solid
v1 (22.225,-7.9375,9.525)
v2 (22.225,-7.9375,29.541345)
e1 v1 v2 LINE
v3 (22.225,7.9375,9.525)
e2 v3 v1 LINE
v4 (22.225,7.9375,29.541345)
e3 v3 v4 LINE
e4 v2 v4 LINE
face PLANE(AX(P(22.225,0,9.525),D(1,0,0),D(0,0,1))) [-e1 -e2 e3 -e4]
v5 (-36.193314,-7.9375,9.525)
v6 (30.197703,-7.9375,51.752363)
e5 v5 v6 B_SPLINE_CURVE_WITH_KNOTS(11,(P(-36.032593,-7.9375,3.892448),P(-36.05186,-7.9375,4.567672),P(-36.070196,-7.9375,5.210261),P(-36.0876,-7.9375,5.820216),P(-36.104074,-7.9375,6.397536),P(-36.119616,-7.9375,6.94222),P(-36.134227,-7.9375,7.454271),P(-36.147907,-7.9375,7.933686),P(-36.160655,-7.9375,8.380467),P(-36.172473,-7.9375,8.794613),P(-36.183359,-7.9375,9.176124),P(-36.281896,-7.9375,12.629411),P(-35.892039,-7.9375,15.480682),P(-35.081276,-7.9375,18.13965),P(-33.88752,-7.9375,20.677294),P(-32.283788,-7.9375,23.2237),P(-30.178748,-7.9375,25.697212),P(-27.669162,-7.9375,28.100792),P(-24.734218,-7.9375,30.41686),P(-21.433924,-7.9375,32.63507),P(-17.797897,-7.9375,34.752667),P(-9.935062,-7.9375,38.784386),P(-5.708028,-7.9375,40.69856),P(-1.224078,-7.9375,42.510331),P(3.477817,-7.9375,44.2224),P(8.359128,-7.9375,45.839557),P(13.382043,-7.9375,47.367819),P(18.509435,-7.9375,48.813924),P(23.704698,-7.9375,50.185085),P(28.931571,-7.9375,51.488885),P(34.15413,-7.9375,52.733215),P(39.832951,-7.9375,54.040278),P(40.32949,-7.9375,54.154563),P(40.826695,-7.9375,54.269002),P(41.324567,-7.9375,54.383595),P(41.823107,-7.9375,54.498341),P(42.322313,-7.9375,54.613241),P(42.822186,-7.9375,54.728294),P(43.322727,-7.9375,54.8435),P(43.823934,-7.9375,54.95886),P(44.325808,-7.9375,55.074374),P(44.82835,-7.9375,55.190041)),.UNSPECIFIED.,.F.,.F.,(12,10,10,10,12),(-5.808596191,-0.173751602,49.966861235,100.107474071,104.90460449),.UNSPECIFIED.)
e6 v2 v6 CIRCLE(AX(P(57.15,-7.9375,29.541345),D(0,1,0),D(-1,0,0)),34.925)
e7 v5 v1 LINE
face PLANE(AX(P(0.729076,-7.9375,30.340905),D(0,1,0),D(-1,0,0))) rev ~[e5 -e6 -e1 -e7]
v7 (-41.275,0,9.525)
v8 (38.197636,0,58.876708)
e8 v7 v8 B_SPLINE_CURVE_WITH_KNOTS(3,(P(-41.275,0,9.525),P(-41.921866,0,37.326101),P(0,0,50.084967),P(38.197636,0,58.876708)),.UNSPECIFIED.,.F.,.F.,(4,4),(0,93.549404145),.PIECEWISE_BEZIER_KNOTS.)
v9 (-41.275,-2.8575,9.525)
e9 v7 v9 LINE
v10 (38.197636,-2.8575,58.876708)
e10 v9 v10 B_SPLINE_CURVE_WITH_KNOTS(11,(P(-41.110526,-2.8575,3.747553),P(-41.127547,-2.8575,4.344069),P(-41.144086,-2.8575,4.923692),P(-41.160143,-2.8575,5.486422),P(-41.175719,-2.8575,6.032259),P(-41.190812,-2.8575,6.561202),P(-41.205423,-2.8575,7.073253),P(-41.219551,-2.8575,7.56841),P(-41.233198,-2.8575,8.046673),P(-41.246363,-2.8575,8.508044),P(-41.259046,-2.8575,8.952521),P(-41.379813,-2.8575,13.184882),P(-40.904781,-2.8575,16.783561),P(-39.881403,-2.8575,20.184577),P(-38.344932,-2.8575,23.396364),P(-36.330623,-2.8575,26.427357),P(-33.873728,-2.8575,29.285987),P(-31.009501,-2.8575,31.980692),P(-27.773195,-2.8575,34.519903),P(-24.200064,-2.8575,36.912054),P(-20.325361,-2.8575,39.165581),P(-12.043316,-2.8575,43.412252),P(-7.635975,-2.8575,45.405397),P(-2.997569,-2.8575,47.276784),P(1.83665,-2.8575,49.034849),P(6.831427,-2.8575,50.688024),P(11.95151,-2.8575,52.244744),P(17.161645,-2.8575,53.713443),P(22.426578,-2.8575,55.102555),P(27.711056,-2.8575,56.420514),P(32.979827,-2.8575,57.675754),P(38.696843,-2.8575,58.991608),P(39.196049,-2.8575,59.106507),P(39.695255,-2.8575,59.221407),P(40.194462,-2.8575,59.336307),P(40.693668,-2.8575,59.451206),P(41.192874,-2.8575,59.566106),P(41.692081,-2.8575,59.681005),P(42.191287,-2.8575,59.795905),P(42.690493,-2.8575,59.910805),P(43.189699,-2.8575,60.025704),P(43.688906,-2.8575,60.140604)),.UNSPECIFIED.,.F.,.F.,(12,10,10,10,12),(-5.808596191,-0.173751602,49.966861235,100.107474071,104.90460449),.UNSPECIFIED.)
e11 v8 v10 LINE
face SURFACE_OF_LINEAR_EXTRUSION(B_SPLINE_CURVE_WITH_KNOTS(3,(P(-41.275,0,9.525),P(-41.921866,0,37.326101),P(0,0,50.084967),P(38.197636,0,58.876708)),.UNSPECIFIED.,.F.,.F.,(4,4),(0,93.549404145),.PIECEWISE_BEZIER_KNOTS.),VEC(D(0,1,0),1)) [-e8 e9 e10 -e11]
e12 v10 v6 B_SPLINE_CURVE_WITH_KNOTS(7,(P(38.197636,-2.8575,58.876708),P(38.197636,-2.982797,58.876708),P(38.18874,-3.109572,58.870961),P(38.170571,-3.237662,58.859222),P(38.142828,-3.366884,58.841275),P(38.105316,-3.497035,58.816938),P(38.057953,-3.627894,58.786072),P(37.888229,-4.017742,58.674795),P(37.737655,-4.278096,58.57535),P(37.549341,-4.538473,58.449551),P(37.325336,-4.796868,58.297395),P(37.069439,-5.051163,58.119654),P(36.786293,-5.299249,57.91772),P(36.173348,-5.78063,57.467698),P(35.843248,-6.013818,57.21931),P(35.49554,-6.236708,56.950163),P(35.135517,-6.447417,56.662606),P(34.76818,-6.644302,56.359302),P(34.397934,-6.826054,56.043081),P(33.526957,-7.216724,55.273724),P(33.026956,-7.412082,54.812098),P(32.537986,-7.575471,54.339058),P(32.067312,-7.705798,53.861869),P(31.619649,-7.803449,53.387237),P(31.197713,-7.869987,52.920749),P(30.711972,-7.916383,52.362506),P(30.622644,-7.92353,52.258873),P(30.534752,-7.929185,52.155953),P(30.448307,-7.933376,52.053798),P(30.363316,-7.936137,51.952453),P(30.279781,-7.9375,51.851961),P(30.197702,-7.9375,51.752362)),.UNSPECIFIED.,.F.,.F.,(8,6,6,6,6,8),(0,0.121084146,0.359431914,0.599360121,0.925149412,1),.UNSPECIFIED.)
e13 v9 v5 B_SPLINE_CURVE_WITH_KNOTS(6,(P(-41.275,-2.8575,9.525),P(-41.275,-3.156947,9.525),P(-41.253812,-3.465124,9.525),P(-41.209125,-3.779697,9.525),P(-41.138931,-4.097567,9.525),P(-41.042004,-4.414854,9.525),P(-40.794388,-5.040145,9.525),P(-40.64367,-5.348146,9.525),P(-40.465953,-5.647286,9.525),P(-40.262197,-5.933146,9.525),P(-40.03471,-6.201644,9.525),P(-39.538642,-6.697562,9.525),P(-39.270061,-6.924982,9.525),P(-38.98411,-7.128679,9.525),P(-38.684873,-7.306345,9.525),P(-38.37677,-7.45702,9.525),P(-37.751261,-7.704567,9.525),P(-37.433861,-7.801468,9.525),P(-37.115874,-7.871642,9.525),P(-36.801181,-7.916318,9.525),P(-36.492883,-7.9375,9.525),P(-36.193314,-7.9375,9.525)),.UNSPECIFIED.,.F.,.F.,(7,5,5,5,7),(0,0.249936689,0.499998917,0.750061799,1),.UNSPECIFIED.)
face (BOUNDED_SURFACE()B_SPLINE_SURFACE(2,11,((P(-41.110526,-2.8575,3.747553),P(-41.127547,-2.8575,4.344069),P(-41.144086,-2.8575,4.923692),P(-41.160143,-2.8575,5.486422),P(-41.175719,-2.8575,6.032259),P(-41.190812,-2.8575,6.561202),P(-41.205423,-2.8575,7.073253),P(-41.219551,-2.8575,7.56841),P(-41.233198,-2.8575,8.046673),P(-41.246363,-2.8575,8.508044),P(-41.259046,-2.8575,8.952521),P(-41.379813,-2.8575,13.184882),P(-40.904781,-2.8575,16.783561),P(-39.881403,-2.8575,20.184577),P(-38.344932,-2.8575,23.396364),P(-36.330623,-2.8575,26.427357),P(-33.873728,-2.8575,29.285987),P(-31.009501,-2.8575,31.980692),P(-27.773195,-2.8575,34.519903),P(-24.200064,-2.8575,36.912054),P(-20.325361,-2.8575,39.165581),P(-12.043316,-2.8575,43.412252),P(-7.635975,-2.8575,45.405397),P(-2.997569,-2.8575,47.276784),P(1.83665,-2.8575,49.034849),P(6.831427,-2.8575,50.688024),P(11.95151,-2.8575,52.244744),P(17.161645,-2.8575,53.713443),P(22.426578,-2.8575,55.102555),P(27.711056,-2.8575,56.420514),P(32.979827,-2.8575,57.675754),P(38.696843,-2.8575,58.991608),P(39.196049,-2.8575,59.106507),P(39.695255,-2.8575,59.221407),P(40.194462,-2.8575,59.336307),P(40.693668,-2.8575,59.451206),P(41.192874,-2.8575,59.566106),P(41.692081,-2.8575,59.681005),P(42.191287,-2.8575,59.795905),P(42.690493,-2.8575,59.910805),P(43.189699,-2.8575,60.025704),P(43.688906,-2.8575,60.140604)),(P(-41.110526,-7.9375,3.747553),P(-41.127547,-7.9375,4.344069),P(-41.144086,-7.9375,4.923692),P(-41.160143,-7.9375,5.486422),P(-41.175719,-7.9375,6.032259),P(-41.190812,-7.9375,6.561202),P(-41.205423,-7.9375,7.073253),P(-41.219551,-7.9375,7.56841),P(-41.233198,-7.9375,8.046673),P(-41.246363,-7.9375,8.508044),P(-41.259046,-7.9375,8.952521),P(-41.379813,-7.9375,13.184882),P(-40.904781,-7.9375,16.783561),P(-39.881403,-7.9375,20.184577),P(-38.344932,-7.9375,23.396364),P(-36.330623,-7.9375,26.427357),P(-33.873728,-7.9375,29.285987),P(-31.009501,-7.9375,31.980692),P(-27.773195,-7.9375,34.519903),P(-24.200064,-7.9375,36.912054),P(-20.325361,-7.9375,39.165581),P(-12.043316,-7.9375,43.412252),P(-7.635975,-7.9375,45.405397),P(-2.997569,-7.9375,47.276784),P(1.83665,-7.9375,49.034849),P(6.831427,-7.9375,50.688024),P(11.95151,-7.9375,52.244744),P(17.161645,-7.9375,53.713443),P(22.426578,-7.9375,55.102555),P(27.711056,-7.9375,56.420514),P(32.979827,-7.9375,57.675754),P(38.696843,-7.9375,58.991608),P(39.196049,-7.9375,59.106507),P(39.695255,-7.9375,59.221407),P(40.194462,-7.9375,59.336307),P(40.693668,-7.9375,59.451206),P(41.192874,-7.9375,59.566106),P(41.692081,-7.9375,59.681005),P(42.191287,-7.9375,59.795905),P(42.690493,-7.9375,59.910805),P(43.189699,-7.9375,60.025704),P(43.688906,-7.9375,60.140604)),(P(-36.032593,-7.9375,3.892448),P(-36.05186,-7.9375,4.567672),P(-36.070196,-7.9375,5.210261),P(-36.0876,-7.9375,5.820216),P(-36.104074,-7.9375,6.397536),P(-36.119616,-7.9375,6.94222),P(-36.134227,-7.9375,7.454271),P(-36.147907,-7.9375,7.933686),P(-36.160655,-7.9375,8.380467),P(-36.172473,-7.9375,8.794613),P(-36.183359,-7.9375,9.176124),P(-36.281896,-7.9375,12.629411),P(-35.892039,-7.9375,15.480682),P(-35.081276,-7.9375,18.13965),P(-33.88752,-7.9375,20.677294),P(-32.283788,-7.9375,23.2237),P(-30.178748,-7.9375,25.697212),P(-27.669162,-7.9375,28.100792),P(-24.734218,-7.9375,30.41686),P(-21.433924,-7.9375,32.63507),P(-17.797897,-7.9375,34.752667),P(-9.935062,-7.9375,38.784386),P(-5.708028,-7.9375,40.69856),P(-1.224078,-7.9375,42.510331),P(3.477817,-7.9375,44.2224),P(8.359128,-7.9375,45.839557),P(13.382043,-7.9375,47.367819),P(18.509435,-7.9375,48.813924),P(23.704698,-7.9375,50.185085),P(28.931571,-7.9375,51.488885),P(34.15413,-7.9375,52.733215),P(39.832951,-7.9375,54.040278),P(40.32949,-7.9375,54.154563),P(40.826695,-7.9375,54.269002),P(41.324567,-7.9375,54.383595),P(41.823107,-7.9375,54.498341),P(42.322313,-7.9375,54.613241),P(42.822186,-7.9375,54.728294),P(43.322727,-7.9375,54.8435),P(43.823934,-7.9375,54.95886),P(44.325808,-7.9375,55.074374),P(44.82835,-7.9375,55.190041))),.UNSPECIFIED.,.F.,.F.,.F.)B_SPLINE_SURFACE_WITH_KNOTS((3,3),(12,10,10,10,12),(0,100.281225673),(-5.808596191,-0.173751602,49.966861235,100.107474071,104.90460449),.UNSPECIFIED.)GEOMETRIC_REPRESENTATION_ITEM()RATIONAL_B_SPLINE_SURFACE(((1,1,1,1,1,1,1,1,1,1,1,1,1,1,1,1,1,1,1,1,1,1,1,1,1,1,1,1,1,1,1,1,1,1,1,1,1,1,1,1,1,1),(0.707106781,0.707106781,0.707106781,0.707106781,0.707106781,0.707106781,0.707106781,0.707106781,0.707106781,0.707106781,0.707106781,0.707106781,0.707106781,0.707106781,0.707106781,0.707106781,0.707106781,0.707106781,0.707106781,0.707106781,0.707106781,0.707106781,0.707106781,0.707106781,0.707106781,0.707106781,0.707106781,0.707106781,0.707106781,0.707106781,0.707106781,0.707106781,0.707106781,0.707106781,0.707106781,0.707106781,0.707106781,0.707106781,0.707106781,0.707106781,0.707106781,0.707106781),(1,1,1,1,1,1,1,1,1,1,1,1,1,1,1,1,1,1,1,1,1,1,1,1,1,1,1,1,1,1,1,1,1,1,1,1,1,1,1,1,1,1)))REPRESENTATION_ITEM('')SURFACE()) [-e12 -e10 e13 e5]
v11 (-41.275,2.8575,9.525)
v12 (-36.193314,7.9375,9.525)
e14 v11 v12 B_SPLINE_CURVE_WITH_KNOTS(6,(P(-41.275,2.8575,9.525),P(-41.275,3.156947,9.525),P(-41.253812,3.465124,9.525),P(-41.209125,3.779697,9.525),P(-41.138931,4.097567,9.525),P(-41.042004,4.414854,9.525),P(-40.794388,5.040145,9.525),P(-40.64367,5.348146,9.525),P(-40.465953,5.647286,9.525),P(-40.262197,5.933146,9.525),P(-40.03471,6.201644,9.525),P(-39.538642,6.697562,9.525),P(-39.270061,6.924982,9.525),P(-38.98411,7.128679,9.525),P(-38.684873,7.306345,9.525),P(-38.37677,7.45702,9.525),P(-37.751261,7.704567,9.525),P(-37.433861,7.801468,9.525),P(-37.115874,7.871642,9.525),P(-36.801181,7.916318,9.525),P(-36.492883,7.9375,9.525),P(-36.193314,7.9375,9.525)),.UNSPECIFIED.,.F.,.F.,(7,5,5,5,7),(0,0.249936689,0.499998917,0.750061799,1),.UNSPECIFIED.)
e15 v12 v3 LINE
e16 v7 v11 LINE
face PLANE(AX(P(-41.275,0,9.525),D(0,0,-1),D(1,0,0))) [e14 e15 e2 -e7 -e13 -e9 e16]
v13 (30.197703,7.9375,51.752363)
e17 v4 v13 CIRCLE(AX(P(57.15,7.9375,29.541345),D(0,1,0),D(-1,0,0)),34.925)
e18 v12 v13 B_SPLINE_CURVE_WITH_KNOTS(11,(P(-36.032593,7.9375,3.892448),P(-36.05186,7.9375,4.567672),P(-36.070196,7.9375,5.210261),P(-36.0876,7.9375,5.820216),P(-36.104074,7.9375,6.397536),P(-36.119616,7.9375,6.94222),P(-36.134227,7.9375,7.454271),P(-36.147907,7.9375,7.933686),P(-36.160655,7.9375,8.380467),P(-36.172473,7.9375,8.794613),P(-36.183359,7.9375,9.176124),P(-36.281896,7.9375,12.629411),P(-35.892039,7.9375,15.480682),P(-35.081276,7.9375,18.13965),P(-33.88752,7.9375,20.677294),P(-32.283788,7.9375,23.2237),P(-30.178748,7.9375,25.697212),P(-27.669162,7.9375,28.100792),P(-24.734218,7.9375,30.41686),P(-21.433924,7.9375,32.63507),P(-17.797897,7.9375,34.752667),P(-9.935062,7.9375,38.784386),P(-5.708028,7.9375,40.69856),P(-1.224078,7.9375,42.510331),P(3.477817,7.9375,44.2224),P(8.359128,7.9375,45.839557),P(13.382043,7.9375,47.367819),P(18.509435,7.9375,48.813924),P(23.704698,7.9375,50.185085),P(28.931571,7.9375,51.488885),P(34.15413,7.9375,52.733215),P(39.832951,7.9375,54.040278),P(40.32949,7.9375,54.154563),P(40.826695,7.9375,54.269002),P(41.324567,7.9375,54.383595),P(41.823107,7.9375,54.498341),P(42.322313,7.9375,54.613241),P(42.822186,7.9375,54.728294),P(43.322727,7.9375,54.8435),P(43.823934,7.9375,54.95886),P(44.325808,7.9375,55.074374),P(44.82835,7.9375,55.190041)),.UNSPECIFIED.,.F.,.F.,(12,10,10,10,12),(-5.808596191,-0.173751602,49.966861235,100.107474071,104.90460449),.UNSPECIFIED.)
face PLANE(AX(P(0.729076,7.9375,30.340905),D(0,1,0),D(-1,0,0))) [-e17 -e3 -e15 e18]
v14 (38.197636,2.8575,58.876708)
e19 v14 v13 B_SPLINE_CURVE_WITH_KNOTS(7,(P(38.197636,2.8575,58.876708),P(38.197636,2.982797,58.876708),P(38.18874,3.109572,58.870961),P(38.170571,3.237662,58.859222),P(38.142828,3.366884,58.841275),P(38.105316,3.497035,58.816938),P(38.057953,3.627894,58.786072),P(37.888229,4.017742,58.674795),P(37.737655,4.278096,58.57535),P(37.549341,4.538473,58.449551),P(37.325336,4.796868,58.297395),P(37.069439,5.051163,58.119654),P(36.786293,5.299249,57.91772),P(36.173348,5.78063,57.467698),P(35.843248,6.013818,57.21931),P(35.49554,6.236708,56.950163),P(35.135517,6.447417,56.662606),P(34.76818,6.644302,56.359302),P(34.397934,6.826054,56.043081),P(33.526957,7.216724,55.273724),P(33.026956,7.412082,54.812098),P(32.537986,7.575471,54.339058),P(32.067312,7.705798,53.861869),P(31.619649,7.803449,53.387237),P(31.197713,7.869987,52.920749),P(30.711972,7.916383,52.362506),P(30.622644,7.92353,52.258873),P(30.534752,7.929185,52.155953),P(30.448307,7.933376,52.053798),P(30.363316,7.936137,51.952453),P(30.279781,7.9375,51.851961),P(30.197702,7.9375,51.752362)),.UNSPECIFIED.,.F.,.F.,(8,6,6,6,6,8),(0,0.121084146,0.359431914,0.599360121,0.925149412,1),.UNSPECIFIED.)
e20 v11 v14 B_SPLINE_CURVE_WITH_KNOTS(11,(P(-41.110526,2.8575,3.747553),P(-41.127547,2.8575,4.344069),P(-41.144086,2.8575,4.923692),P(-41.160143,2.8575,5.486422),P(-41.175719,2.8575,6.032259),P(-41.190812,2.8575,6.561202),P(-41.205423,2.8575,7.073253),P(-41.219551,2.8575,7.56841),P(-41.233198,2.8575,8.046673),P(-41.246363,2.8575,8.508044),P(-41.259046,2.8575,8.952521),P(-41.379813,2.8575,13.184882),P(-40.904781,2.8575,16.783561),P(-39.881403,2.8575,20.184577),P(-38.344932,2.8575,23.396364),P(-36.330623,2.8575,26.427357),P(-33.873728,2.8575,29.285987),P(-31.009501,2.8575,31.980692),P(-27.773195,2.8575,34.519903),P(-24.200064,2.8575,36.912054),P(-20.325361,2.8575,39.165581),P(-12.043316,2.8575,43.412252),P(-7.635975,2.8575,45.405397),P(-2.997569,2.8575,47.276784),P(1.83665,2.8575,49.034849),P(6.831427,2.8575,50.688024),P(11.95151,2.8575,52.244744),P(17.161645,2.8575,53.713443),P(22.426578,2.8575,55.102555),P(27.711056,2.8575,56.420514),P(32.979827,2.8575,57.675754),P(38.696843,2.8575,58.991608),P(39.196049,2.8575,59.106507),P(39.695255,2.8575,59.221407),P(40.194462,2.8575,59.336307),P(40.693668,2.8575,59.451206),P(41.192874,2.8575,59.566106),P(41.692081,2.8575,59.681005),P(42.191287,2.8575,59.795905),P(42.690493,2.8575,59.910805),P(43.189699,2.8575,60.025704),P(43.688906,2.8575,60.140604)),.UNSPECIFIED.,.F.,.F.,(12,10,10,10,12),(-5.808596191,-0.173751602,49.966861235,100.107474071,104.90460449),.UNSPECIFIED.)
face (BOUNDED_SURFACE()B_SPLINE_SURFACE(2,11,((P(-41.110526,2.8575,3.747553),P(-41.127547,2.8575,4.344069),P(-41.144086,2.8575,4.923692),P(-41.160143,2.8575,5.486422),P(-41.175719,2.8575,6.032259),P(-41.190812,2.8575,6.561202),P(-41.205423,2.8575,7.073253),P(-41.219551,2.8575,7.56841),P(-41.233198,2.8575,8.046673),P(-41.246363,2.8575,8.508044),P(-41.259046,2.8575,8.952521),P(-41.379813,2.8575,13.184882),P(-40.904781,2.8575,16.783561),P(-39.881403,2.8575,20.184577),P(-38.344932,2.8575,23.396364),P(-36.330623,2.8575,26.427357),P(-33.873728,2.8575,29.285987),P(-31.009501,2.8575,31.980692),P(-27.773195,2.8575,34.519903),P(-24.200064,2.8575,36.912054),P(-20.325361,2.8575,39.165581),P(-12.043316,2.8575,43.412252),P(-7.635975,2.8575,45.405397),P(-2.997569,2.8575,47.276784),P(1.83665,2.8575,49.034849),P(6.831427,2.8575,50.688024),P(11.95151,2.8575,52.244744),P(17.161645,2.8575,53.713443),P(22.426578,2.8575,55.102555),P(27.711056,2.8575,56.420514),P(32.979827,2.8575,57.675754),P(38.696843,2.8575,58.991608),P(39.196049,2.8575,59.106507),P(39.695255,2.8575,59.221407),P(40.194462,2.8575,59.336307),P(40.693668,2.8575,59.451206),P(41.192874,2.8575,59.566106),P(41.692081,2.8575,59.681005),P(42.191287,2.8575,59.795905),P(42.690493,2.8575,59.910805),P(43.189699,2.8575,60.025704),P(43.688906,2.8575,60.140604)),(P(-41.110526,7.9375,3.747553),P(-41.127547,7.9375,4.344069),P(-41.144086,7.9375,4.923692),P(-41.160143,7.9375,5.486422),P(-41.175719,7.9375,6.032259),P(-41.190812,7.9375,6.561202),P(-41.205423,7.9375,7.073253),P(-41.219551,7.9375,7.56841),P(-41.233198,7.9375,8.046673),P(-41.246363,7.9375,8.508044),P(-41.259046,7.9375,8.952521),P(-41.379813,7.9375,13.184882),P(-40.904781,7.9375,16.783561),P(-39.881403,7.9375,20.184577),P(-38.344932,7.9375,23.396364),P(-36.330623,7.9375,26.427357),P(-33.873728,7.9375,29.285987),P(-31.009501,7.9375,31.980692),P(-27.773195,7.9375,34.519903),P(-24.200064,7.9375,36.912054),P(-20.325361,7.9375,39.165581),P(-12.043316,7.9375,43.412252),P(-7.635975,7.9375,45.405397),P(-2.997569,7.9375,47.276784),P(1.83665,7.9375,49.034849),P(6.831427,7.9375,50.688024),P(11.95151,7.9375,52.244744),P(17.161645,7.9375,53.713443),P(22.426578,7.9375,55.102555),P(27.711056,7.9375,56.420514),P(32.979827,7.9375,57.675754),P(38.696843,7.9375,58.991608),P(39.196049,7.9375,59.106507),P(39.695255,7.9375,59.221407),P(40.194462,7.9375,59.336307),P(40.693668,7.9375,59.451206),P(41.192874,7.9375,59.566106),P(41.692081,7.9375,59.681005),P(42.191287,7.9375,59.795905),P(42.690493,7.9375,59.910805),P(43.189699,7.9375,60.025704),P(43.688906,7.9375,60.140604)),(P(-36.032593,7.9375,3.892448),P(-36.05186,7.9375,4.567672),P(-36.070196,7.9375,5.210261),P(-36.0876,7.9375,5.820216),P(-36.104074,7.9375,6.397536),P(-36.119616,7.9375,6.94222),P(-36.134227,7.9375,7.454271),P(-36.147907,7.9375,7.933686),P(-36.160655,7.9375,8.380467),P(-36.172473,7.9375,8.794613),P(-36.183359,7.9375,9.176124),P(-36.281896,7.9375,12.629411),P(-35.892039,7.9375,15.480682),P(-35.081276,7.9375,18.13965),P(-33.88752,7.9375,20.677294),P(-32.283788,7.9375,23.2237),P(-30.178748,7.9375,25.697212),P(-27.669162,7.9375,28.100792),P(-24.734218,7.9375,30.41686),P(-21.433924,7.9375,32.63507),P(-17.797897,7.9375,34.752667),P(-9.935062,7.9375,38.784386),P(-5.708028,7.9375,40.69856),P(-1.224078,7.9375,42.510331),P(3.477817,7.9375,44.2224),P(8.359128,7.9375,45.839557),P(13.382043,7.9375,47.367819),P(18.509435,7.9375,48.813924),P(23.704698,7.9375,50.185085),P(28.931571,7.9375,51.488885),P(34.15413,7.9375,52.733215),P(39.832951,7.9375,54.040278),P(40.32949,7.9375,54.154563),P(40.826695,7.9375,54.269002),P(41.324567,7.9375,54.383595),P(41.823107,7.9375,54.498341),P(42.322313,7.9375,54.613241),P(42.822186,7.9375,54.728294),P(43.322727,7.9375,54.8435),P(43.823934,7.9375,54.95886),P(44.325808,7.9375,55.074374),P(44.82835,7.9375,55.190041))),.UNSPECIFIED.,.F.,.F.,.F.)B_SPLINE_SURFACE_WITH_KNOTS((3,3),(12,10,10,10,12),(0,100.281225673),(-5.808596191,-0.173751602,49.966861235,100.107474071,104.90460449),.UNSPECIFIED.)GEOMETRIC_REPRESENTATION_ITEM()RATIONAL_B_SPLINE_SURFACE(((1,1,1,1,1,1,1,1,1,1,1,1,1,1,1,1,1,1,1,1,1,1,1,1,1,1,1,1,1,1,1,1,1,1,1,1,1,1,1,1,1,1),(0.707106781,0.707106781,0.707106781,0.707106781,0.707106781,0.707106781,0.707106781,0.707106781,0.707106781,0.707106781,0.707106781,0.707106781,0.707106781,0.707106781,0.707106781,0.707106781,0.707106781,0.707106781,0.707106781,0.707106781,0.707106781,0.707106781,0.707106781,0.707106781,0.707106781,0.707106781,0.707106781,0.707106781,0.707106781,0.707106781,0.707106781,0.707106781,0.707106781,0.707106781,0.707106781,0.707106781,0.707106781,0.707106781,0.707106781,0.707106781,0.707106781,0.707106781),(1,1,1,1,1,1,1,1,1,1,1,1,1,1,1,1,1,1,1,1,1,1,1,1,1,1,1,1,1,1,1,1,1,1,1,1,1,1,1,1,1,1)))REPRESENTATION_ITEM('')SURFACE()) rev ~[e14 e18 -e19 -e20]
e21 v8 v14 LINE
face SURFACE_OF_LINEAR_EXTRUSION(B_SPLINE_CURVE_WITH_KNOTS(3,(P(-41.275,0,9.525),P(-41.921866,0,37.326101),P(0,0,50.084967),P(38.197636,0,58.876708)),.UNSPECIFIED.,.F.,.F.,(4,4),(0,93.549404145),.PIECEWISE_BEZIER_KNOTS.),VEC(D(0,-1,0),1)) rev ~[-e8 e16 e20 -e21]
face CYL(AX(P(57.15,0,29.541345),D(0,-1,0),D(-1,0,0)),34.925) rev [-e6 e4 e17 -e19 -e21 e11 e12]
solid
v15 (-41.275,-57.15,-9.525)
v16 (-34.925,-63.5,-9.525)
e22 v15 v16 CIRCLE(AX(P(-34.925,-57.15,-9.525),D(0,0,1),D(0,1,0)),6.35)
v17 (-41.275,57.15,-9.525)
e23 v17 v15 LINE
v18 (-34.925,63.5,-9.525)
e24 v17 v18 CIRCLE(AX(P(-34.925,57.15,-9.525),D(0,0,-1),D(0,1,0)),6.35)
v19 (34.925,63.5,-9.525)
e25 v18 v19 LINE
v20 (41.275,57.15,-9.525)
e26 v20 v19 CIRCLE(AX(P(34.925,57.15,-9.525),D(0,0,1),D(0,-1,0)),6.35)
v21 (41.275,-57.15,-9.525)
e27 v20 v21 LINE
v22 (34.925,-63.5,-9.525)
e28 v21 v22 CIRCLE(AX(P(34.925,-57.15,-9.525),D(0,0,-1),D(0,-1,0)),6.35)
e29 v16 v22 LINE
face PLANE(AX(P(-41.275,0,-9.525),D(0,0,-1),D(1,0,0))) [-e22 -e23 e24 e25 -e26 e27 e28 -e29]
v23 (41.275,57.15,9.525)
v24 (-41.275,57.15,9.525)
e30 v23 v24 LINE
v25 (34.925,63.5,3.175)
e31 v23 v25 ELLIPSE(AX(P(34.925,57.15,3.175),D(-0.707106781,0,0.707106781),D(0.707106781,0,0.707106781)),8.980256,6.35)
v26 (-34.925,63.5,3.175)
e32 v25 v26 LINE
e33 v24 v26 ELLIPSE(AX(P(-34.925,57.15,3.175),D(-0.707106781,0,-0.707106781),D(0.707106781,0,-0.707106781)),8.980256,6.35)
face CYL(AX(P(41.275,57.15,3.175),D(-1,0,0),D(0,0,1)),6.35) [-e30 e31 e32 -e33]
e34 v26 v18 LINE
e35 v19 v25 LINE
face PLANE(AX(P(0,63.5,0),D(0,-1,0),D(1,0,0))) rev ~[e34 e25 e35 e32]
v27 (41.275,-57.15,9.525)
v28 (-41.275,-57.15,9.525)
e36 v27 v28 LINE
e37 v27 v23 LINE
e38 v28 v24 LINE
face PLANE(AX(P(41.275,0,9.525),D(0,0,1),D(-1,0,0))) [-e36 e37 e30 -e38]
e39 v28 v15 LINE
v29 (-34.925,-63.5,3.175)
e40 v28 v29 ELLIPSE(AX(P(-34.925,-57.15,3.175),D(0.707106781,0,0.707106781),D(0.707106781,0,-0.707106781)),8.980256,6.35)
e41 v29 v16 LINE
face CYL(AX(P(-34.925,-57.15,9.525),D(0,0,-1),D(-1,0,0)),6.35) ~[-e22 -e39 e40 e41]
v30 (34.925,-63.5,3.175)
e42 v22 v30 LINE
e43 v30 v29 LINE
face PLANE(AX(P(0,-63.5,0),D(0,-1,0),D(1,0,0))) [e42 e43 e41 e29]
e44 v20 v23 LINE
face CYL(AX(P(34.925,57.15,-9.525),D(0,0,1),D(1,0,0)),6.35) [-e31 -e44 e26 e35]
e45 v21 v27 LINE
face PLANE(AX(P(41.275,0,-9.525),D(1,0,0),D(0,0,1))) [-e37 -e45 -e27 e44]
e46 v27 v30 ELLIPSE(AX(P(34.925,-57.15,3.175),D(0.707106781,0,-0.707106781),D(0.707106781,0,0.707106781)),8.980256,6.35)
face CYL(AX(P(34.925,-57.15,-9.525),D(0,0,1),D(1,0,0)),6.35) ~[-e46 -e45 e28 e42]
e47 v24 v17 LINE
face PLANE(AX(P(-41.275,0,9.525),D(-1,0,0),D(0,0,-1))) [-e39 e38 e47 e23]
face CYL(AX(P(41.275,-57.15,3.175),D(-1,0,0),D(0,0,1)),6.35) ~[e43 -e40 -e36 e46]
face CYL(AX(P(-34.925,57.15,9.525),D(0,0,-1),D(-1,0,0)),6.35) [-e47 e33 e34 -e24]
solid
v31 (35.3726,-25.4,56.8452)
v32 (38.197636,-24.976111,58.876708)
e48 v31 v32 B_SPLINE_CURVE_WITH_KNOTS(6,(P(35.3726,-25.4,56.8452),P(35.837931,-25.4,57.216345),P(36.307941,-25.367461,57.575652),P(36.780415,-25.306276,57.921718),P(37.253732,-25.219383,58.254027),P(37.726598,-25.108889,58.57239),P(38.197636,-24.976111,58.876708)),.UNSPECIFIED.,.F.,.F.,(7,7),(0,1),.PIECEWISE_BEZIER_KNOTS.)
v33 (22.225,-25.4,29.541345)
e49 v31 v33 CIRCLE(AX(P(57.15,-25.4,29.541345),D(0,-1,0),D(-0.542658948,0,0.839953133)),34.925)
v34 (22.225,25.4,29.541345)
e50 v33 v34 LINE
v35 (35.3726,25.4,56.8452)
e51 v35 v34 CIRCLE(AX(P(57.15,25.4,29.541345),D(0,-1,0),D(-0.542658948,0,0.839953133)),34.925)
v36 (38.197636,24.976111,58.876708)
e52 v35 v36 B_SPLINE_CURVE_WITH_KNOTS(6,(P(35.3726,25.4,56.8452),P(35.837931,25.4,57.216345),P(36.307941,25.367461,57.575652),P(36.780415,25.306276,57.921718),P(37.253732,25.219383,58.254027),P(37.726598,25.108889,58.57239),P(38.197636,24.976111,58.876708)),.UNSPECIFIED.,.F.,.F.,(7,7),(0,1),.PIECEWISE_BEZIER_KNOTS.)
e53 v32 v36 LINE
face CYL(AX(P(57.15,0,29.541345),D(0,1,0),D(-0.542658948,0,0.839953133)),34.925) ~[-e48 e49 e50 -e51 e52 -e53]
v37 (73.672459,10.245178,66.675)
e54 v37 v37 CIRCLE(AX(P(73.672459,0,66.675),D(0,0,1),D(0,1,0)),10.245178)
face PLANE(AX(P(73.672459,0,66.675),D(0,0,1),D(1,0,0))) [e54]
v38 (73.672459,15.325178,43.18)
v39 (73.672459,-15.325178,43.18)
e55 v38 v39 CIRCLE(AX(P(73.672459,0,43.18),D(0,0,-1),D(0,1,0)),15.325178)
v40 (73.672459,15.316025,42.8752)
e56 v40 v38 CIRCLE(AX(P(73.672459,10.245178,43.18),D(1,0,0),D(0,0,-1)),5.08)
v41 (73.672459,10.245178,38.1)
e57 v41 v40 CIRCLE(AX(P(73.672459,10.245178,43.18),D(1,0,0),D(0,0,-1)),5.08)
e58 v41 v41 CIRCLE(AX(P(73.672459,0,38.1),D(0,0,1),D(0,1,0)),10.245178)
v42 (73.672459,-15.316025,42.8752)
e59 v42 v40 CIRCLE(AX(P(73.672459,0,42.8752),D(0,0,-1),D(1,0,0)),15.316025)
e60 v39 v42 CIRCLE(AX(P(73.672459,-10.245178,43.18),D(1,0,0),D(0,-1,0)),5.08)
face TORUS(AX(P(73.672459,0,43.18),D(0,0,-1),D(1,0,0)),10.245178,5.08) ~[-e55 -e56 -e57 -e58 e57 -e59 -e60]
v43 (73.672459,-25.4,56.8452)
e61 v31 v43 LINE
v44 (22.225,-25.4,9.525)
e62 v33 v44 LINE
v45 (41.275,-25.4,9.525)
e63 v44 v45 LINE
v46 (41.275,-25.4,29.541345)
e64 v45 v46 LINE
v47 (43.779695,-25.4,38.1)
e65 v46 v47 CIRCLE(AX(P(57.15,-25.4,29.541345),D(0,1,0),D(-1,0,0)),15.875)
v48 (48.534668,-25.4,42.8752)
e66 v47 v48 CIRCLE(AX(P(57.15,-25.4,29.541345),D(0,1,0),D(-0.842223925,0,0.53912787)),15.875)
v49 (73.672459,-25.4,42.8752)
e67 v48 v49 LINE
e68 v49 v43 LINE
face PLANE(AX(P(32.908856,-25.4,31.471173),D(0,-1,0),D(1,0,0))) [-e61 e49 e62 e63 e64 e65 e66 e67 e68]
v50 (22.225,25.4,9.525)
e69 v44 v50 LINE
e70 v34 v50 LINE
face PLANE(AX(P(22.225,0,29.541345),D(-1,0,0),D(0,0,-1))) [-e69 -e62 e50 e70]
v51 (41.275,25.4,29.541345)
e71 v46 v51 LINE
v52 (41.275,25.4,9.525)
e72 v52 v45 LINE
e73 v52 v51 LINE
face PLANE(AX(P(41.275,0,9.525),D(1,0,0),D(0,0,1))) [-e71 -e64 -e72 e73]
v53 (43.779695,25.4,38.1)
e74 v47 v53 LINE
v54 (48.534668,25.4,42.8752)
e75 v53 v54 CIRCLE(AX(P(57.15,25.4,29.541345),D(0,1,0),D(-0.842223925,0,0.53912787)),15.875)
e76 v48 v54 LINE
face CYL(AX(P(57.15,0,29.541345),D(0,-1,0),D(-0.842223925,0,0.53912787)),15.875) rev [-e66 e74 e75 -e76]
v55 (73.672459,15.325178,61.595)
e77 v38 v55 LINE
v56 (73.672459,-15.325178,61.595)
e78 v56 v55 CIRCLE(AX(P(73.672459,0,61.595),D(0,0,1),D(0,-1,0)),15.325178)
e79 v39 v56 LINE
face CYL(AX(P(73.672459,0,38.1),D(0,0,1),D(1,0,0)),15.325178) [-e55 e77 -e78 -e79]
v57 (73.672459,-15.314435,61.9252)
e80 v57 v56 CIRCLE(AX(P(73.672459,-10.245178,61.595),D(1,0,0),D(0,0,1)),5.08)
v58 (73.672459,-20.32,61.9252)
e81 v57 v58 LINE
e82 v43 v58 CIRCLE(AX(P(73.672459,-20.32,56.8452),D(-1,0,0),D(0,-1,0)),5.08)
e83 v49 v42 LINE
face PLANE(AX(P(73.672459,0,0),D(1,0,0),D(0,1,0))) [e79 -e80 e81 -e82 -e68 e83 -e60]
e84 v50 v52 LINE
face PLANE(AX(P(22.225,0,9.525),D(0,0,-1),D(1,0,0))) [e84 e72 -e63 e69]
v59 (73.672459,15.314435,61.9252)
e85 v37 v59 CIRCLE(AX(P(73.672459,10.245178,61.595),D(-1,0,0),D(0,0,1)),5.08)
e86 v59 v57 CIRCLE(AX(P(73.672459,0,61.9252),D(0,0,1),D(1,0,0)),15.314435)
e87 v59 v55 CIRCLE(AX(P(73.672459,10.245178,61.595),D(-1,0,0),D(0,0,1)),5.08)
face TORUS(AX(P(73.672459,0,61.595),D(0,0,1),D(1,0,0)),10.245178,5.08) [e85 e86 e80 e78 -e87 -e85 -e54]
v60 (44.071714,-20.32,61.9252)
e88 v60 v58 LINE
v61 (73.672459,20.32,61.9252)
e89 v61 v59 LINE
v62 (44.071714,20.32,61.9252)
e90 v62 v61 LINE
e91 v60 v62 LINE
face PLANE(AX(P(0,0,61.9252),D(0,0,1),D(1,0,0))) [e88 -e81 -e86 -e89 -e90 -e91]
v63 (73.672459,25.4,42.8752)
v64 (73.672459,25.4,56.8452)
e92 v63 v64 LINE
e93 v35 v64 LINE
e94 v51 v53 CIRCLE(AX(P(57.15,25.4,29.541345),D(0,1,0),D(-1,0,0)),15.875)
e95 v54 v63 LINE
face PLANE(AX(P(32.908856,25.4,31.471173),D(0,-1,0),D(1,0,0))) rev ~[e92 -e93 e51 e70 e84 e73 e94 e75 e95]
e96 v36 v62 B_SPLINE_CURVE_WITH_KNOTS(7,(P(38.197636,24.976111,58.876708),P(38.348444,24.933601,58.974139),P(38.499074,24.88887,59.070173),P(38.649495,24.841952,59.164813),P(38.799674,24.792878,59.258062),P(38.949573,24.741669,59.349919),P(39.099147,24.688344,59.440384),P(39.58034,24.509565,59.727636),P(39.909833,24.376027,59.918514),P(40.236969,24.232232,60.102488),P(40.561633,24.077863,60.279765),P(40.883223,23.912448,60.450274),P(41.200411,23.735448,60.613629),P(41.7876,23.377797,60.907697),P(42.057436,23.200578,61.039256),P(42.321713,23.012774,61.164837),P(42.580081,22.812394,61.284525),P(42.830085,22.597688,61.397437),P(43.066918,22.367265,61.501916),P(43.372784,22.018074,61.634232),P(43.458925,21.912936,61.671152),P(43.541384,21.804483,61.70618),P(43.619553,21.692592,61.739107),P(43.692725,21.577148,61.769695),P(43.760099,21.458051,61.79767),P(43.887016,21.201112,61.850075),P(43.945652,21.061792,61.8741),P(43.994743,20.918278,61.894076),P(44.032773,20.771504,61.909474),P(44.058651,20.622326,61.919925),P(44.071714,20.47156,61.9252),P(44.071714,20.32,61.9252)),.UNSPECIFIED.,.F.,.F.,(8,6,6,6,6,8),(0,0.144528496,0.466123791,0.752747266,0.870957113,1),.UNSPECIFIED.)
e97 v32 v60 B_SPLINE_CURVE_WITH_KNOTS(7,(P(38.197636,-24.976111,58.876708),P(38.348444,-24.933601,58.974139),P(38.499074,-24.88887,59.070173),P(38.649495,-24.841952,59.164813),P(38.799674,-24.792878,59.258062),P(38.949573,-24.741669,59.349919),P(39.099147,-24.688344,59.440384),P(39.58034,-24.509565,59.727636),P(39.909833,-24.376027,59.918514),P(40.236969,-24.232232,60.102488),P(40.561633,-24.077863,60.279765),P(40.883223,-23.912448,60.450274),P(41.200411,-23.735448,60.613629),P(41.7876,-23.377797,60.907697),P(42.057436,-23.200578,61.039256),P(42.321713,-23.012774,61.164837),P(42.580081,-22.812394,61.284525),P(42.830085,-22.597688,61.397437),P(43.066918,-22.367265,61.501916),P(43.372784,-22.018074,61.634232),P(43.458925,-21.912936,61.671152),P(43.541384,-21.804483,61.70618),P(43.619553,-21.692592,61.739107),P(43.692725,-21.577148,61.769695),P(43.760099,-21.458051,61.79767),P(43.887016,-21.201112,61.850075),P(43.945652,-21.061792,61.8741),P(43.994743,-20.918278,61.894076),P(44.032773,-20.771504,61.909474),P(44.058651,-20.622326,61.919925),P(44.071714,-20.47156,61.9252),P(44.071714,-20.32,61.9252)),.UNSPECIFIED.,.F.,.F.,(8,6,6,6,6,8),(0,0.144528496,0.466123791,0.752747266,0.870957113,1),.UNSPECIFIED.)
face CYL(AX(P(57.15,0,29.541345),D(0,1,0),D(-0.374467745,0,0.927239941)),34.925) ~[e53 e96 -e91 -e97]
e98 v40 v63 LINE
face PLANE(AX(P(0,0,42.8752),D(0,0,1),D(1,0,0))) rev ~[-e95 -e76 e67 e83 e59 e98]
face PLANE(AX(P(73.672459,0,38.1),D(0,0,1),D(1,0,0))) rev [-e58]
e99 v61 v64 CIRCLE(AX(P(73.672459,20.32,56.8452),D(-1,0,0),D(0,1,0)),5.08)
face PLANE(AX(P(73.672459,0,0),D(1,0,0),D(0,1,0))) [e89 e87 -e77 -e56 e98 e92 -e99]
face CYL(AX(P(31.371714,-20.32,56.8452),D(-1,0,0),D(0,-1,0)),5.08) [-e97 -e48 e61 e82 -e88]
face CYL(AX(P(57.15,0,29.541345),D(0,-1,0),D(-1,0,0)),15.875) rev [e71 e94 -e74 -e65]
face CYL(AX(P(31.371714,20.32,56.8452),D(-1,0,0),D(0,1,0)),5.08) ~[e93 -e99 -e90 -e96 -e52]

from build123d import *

# Parameters (mm, degrees)
F1_DEPTH    = 63.5
F2_DEPTH    = 7.9375
F3_DEPTH    = 25.4
F5_R        = 6.35
F6_T1_DEPTH = 55.0007445182
F6_2_F1_R   = 5.08
F6_2_F2_R   = 5.08


# Not quite as in the source:
# - a fillet or chamfer that OpenCascade refuses, or shapes differently, is made with other operations: its cross-section is extruded or revolved along the edge and cut away or added


with BuildPart() as f1:
    # F0 (on Front) → F1 (new body, symmetric)
    with BuildSketch(Plane.XZ):
        Polygon((-41.275, 9.525), (-41.275, -9.525), (41.275, -9.525), (41.275, 9.525), (22.225, 9.525), align=None)
    extrude(amount=F1_DEPTH, both=True)

    # F5
    f5_edges = [f1.edges().sort_by_distance(p)[0] for p in [
        (-41.275, -63.5, 0),
        (41.275, -63.5, 0),
        (41.275, 63.5, 0),
        (-41.275, 63.5, 0),
        (0, 63.5, 9.525),
        (0, -63.5, 9.525),
    ]]
    fillet(f5_edges, radius=F5_R)


with BuildPart() as f2:
    # F0 (on Front) → F2 (new body, symmetric)
    with BuildSketch(Plane.XZ):
        with BuildLine():
            add(Edge.make_bspline(
                [(-41.275, 9.525), (-41.9218663516, 37.3261011822), (0, 50.0849671662), (38.1976362328, 58.8767082382)],
                knots=[0, 0, 0, 0, 93.5494041446, 93.5494041446, 93.5494041446, 93.5494041446], degree=3))
            Line((-41.275, 9.525), (22.225, 9.525))
            Line((22.225, 9.525), (22.225, 29.5413450627))
            ThreePointArc((22.225, 29.5413450627), (26.4769912662, 46.2423079157), (38.1976362328, 58.8767082382))
        make_face()
    extrude(amount=F2_DEPTH, both=True)

    # F6#2: fillet of radius 5.08 on 2 edges, made by hand

    # F6_2_f1
    f6_2_f1_edges = [f2.edges().sort_by_distance(p)[0] for p in [
        (-16.1053703527, 7.9375, 41.3293641604),
    ]]
    fillet(f6_2_f1_edges, radius=F6_2_F1_R)

    # F6_2_f2
    f6_2_f2_edges = [f2.edges().sort_by_distance(p)[0] for p in [
        (-16.1053703527, -7.9375, 41.3293641604),
    ]]
    fillet(f6_2_f2_edges, radius=F6_2_F2_R)


with BuildPart() as f3:
    # F0 (on Front) → F3 (new body, symmetric)
    with BuildSketch(Plane.XZ):
        with BuildLine():
            Line((22.225, 9.525), (41.275, 9.525))
            Line((41.275, 9.525), (41.275, 29.5413450627))
            ThreePointArc((41.275, 29.5413450627), (41.9140357405, 34.0001585915), (43.7796951918, 38.1))
            Line((43.7796951918, 38.1), (38.1976362328, 38.1))
            Line((38.1976362328, 38.1), (38.1976362328, 58.8767082382))
            ThreePointArc((38.1976362328, 58.8767082382), (26.4769912662, 46.2423079157), (22.225, 29.5413450627))
            Line((22.225, 29.5413450627), (22.225, 9.525))
        make_face()
        with BuildLine():
            ThreePointArc((44.0717140113, 61.9252), (41.0623041907, 60.5404042186), (38.1976362328, 58.8767082382))
            Line((38.1976362328, 58.8767082382), (38.1976362328, 38.1))
            Line((38.1976362328, 38.1), (43.7796951918, 38.1))
            ThreePointArc((43.7796951918, 38.1), (45.9008806945, 40.7428154953), (48.5346684619, 42.8752))
            Line((48.5346684619, 42.8752), (73.6724585295, 42.8752))
            Line((73.6724585295, 42.8752), (73.6724585295, 61.9252))
            Line((73.6724585295, 61.9252), (44.0717140113, 61.9252))
        make_face()
    extrude(amount=F3_DEPTH, both=True)

    # F0 (on Front) → F4 (revolve)
    with BuildSketch(Plane.XZ):
        Polygon((88.9976362328, 66.675), (73.6724585295, 66.675), (73.6724585295, 61.9252), (73.6724585295, 42.8752), (73.6724585295, 38.1), (88.9976362328, 38.1), align=None)
    revolve(axis=Axis((73.6724585295, 0, 52.3875), (0, 0, 1)))

    # F6: fillet of radius 5.08 on 4 edges, made by hand

    # F6_s2 → F6_t1 (cut)
    with BuildSketch(Plane.YZ.offset(31.3717140113)):
        with BuildLine():
            ThreePointArc((-25.4, 56.8452), (-23.9121024484, 60.4373024484), (-20.32, 61.9252))
            Line((-20.32, 61.9252), (-25.4, 61.9252))
            Line((-25.4, 61.9252), (-25.4, 56.8452))
        make_face()
        with BuildLine():
            ThreePointArc((25.4, 56.8452), (23.9121024484, 60.4373024484), (20.32, 61.9252))
            Line((20.32, 61.9252), (25.4, 61.9252))
            Line((25.4, 61.9252), (25.4, 56.8452))
        make_face()
    extrude(amount=F6_T1_DEPTH, mode=Mode.SUBTRACT)


with BuildPart() as f6_tool4:
    # F6_s5 → F6_t6 (revolve)
    with BuildSketch(Plane.XZ):
        with BuildLine():
            ThreePointArc((88.9976362328, 43.18), (87.5097386812, 39.5878975516), (83.9176362328, 38.1))
            Line((83.9176362328, 38.1), (88.9976362328, 38.1))
            Line((88.9976362328, 38.1), (88.9976362328, 43.18))
        make_face()
    revolve(axis=Axis((73.6724585295, 0, 38.1), (0, 0, 1)))

    split(bisect_by=Plane.XY.offset(42.8752), keep=Keep.TOP)

    split(bisect_by=Plane.YZ.offset(73.6724585295), keep=Keep.TOP)


with BuildPart() as f3_1:
    add(f3.part)

    # F6_t3: cut F6_tool4
    add(f6_tool4.part, mode=Mode.SUBTRACT)


with BuildPart() as f6_tool10:
    # F6_s11 → F6_t12 (revolve)
    with BuildSketch(Plane.XZ):
        with BuildLine():
            ThreePointArc((88.9976362328, 43.18), (87.5097386812, 39.5878975516), (83.9176362328, 38.1))
            Line((83.9176362328, 38.1), (88.9976362328, 38.1))
            Line((88.9976362328, 38.1), (88.9976362328, 43.18))
        make_face()
    revolve(axis=Axis((73.6724585295, 0, 38.1), (0, 0, 1)))

    split(bisect_by=Plane.XY.offset(42.8752), keep=Keep.BOTTOM)

    split(bisect_by=Plane.YZ.offset(73.6724585295), keep=Keep.TOP)


with BuildPart() as f3_2:
    add(f3_1.part)

    # F6_t9: cut F6_tool10
    add(f6_tool10.part, mode=Mode.SUBTRACT)


with BuildPart() as f6_tool16:
    # F6_s17 → F6_t18 (revolve)
    with BuildSketch(Plane.XZ):
        with BuildLine():
            ThreePointArc((88.9976362328, 43.18), (87.5097386812, 39.5878975516), (83.9176362328, 38.1))
            Line((83.9176362328, 38.1), (88.9976362328, 38.1))
            Line((88.9976362328, 38.1), (88.9976362328, 43.18))
        make_face()
    revolve(axis=Axis((73.6724585295, 0, 38.1), (0, 0, 1)))

    split(bisect_by=Plane.XY.offset(42.8752), keep=Keep.BOTTOM)

    split(bisect_by=Plane.YZ.offset(73.6724585295), keep=Keep.BOTTOM)


with BuildPart() as f3_3:
    add(f3_2.part)

    # F6_t15: cut F6_tool16
    add(f6_tool16.part, mode=Mode.SUBTRACT)


with BuildPart() as f6_tool22:
    # F6_s23 → F6_t24 (revolve)
    with BuildSketch(Plane.XZ):
        with BuildLine():
            ThreePointArc((88.9976362328, 61.595), (87.5097386812, 65.1871024484), (83.9176362328, 66.675))
            Line((83.9176362328, 66.675), (88.9976362328, 66.675))
            Line((88.9976362328, 66.675), (88.9976362328, 61.595))
        make_face()
    revolve(axis=Axis((73.6724585295, 0, 66.675), (0, 0, 1)))

    split(bisect_by=Plane.YZ.offset(73.6724585295), keep=Keep.TOP)

    split(bisect_by=Plane.XY.offset(61.9252), keep=Keep.BOTTOM)


with BuildPart() as f3_4:
    add(f3_3.part)

    # F6_t21: cut F6_tool22
    add(f6_tool22.part, mode=Mode.SUBTRACT)


with BuildPart() as f6_tool28:
    # F6_s29 → F6_t30 (revolve)
    with BuildSketch(Plane.XZ):
        with BuildLine():
            ThreePointArc((88.9976362328, 61.595), (87.5097386812, 65.1871024484), (83.9176362328, 66.675))
            Line((83.9176362328, 66.675), (88.9976362328, 66.675))
            Line((88.9976362328, 66.675), (88.9976362328, 61.595))
        make_face()
    revolve(axis=Axis((73.6724585295, 0, 66.675), (0, 0, 1)))

    split(bisect_by=Plane.YZ.offset(73.6724585295), keep=Keep.TOP)

    split(bisect_by=Plane.XY.offset(61.9252), keep=Keep.TOP)


with BuildPart() as f3_5:
    add(f3_4.part)

    # F6_t27: cut F6_tool28
    add(f6_tool28.part, mode=Mode.SUBTRACT)


with BuildPart() as f6_tool34:
    # F6_s35 → F6_t36 (revolve)
    with BuildSketch(Plane.XZ):
        with BuildLine():
            ThreePointArc((88.9976362328, 61.595), (87.5097386812, 65.1871024484), (83.9176362328, 66.675))
            Line((83.9176362328, 66.675), (88.9976362328, 66.675))
            Line((88.9976362328, 66.675), (88.9976362328, 61.595))
        make_face()
    revolve(axis=Axis((73.6724585295, 0, 66.675), (0, 0, 1)))

    split(bisect_by=Plane.YZ.offset(73.6724585295), keep=Keep.BOTTOM)

    split(bisect_by=Plane.XY.offset(61.9252), keep=Keep.TOP)


with BuildPart() as f3_6:
    add(f3_5.part)

    # F6_t33: cut F6_tool34
    add(f6_tool34.part, mode=Mode.SUBTRACT)


solid = Compound([f1.part, f2.part, f3_6.part])
